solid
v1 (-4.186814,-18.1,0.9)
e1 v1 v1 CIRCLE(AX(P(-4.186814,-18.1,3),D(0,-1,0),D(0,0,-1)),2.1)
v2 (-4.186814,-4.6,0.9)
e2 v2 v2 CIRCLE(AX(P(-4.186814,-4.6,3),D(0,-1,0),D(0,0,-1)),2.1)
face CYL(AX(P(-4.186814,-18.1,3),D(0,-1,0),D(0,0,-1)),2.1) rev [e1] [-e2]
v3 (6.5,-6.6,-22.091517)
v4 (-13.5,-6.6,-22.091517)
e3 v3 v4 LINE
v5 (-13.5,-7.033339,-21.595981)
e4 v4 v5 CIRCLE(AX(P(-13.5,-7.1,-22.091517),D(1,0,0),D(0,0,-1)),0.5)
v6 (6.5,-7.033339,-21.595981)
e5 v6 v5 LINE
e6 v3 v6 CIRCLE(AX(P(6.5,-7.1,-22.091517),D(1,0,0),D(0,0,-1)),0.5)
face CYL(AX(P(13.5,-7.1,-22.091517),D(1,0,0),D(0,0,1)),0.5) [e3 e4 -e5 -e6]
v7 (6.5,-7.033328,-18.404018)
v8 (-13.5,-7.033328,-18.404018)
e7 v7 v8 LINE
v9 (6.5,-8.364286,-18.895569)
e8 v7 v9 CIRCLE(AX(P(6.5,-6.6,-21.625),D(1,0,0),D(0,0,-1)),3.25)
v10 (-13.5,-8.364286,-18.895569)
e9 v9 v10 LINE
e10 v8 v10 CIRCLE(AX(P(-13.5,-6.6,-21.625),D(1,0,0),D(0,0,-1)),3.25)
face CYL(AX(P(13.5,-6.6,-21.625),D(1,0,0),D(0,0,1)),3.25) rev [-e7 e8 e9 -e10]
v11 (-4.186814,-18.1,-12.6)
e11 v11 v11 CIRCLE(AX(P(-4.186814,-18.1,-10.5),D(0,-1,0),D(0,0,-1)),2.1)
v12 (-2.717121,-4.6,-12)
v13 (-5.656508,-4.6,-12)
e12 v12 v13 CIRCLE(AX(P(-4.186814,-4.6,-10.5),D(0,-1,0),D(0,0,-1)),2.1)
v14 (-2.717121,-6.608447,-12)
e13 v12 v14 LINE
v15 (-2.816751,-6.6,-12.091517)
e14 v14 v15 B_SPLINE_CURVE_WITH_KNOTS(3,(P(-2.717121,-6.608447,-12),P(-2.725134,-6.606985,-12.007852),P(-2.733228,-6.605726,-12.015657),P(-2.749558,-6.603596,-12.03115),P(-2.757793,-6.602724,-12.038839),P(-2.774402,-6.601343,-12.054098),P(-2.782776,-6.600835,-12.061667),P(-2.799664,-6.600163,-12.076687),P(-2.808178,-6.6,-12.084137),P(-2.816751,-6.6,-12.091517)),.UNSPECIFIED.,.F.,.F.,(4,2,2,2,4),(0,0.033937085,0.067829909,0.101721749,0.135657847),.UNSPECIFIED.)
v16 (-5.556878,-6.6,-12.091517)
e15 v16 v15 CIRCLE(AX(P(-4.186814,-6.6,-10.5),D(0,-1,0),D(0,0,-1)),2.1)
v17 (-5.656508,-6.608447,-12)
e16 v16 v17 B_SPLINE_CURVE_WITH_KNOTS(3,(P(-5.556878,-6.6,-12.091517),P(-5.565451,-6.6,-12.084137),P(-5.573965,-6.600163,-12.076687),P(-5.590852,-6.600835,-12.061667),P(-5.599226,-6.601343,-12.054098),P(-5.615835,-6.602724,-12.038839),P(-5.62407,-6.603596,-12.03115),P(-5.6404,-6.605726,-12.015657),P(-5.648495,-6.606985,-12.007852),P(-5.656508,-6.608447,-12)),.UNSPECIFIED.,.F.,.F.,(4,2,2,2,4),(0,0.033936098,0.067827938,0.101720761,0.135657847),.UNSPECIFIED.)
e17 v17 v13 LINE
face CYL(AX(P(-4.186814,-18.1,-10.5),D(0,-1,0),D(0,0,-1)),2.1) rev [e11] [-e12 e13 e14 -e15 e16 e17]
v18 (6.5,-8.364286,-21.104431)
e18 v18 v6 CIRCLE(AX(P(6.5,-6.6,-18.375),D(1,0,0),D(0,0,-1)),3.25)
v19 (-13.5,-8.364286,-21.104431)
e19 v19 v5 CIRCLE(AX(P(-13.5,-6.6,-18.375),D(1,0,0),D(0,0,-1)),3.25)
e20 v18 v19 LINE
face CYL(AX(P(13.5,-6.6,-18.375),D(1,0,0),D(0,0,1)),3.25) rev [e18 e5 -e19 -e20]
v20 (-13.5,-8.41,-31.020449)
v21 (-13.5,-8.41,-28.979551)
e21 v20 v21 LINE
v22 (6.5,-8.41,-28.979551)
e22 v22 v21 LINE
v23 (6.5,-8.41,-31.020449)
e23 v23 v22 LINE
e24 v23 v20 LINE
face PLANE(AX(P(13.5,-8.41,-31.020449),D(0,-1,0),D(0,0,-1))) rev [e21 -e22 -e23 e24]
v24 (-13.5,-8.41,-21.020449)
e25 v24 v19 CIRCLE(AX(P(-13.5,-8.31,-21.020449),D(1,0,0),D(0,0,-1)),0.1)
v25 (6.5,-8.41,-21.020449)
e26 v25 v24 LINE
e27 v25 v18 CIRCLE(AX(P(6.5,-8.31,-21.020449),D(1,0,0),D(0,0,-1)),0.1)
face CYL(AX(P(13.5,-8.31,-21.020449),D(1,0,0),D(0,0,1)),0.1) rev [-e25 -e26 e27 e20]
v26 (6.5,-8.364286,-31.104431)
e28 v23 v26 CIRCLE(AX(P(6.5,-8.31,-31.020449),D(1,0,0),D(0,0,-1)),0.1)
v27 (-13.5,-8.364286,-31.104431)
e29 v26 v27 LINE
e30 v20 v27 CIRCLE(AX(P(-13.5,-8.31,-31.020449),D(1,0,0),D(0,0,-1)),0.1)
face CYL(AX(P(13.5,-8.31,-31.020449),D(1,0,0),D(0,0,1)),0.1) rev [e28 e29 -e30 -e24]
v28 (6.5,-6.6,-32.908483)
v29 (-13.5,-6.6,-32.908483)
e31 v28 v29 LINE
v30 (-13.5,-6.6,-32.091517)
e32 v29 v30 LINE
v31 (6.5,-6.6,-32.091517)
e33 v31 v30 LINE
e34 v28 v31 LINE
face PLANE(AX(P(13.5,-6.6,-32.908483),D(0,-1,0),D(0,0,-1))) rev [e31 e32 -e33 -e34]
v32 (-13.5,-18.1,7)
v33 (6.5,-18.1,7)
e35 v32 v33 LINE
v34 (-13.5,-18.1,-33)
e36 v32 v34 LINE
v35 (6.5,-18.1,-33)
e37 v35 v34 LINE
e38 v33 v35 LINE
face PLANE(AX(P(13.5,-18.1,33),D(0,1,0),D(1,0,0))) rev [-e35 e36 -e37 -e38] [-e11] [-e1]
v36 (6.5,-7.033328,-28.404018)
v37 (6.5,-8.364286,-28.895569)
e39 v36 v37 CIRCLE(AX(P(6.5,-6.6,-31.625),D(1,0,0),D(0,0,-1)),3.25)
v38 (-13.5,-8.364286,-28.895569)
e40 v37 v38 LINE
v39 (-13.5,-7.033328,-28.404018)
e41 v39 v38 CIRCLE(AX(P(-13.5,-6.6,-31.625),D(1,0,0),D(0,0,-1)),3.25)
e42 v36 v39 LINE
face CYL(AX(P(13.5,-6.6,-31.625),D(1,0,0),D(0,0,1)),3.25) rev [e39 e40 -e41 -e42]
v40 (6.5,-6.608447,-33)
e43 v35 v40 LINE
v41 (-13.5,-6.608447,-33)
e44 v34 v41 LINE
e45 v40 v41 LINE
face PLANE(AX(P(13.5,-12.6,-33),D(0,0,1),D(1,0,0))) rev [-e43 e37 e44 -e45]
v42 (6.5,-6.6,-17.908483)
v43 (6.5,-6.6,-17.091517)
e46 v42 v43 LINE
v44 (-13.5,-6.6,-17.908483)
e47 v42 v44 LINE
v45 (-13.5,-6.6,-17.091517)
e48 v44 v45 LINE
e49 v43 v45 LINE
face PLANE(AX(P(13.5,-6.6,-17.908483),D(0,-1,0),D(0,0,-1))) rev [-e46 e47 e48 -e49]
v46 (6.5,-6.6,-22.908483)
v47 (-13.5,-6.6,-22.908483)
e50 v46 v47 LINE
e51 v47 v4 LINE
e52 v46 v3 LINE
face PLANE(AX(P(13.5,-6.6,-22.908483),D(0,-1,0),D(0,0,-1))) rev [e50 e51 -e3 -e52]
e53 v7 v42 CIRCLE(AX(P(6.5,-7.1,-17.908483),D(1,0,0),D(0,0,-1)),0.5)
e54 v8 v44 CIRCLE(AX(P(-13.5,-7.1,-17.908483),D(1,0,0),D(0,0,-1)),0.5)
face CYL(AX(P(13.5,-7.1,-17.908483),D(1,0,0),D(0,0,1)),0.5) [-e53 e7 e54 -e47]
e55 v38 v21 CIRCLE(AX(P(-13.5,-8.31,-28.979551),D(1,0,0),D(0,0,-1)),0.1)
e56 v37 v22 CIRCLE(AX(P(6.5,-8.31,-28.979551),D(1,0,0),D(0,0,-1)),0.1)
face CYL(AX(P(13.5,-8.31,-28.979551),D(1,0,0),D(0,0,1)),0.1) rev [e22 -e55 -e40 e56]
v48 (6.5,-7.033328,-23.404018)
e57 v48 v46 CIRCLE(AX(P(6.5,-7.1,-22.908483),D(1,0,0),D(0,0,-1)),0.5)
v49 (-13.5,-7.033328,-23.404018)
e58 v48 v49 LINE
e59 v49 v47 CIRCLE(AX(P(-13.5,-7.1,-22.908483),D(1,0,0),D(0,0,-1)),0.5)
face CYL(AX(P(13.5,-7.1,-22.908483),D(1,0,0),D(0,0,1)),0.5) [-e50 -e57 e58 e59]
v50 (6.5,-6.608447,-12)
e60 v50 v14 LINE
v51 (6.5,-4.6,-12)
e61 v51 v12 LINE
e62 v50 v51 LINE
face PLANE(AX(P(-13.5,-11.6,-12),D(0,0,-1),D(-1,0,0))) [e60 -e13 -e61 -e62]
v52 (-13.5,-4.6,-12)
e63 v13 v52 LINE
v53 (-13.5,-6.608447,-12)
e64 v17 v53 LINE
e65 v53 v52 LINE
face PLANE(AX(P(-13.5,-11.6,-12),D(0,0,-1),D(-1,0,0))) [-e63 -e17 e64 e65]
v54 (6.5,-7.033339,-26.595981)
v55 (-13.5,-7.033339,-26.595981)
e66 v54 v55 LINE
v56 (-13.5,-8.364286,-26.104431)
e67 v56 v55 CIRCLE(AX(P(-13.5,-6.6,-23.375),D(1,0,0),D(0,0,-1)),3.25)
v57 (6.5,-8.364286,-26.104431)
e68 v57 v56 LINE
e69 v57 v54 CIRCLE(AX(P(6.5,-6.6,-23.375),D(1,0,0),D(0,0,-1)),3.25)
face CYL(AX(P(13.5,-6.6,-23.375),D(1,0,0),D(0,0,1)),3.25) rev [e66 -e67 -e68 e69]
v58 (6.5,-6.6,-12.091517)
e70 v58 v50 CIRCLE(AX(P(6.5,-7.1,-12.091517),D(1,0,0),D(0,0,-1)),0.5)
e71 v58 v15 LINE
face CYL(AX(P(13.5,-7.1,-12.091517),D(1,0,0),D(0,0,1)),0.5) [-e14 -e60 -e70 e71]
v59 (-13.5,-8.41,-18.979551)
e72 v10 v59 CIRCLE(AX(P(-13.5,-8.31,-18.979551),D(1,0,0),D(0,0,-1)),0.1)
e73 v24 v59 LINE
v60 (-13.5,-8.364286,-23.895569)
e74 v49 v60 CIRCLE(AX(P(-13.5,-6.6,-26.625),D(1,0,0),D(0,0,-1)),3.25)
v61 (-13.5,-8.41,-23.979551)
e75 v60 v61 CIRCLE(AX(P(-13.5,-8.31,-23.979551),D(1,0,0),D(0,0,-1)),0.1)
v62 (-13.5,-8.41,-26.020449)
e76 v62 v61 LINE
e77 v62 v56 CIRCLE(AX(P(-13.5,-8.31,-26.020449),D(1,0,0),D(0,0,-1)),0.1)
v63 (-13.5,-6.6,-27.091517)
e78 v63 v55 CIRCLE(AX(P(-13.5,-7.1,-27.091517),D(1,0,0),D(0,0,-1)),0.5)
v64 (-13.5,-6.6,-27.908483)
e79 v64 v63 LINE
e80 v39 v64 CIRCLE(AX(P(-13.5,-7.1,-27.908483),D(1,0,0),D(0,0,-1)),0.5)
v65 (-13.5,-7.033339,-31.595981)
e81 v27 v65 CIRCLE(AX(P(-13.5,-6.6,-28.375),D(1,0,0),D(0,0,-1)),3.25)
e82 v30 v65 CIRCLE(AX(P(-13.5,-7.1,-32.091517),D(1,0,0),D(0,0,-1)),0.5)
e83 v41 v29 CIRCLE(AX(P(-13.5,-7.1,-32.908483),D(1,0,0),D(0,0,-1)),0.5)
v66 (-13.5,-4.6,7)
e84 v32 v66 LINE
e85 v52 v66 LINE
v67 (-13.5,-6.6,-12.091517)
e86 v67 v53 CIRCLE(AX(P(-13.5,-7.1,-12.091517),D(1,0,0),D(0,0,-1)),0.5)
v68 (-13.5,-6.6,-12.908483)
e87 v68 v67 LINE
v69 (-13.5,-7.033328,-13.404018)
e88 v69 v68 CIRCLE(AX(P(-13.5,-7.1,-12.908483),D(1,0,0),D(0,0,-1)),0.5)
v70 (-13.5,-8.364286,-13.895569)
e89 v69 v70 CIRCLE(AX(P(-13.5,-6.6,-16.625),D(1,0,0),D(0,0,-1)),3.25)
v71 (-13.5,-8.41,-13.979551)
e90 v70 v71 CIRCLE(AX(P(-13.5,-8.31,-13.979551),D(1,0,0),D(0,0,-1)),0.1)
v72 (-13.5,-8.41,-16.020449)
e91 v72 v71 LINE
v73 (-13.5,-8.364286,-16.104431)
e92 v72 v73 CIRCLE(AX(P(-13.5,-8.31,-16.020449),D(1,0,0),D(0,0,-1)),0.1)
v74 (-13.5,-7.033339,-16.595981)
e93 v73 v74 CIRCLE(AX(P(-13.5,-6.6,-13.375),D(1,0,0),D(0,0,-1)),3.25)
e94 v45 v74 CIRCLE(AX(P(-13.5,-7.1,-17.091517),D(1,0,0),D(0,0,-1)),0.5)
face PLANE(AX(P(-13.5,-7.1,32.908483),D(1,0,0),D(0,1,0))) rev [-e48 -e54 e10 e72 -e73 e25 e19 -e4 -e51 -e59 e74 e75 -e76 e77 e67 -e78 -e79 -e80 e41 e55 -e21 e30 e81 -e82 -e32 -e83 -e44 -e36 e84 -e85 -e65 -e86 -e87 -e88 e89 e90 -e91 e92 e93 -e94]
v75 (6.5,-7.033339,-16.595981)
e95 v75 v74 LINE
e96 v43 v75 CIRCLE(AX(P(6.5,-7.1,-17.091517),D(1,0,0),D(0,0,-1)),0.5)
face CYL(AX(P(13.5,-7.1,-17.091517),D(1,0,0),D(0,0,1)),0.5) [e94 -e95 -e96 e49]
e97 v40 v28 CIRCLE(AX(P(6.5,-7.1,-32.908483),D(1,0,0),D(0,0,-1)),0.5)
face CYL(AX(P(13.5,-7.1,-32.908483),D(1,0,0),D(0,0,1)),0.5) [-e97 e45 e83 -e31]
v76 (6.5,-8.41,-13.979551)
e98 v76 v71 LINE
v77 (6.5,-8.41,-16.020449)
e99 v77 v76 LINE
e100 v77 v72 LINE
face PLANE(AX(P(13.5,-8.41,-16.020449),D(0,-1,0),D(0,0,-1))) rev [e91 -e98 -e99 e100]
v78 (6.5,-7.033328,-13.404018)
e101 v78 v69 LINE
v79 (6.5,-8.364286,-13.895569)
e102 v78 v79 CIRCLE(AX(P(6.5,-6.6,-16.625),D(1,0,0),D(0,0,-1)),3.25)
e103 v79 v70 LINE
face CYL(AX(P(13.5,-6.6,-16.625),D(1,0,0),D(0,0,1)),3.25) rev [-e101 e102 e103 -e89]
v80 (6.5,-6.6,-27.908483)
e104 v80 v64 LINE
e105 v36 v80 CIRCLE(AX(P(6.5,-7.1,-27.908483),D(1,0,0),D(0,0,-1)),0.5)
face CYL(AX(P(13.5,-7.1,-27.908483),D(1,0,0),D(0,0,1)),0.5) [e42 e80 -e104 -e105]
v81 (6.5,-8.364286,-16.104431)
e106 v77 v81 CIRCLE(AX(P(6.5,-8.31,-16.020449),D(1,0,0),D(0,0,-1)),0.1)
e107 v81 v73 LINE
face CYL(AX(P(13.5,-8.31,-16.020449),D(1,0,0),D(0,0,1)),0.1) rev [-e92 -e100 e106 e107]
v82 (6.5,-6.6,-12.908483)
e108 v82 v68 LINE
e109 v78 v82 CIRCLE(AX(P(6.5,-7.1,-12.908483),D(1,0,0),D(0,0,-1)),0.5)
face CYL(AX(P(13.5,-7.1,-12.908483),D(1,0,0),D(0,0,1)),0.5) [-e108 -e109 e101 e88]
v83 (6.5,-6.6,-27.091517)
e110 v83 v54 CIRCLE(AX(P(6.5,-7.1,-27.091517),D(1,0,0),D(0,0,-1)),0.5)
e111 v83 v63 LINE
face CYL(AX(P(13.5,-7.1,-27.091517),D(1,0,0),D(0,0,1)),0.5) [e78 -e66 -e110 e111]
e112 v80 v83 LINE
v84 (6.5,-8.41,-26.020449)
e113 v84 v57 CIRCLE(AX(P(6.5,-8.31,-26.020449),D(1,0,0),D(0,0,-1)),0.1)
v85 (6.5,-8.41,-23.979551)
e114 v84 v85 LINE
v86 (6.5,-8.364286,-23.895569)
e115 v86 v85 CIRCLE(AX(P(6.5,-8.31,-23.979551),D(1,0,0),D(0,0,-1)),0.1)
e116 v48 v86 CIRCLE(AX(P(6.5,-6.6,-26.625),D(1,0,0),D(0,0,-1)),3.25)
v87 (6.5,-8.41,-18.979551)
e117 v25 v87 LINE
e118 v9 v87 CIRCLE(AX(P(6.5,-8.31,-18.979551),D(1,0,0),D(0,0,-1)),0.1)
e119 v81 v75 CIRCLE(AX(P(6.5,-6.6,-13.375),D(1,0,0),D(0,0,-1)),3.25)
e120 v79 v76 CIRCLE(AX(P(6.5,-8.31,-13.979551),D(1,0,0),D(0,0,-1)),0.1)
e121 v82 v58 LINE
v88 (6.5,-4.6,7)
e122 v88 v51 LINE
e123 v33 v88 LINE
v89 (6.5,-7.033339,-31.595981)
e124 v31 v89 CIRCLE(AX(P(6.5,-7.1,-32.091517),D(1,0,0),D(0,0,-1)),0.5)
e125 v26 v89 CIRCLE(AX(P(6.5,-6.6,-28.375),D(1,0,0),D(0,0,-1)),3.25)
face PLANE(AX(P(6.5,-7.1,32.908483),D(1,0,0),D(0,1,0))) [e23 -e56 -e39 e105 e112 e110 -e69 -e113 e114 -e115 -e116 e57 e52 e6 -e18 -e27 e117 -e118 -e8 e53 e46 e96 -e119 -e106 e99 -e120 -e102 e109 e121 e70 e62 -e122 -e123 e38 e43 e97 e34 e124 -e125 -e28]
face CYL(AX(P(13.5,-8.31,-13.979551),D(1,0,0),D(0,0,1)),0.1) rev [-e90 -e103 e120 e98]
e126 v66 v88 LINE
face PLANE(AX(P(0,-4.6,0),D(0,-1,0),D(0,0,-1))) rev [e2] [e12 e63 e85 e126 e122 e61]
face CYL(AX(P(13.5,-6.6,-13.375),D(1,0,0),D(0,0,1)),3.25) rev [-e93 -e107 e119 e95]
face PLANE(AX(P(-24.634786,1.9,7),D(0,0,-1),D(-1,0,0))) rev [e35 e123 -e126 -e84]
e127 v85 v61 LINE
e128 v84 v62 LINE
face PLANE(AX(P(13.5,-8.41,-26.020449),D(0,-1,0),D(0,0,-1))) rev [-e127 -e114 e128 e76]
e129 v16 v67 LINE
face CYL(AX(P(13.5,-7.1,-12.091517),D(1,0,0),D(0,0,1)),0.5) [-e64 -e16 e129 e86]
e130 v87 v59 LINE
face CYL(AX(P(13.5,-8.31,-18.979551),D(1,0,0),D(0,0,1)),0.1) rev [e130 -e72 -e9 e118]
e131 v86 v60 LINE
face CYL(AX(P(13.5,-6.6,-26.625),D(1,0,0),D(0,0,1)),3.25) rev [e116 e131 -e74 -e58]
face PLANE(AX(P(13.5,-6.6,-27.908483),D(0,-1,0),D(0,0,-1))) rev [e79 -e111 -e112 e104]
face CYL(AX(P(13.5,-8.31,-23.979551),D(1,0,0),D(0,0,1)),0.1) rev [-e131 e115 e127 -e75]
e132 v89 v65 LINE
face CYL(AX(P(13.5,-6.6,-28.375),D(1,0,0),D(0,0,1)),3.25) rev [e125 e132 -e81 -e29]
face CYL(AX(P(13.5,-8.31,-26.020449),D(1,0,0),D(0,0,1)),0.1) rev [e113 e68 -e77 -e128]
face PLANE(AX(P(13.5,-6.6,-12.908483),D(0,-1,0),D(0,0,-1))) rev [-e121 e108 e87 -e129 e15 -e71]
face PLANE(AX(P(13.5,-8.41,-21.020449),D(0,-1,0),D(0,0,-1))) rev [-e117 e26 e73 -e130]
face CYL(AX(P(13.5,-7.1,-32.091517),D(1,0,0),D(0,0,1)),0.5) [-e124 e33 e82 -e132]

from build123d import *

# Parameters (mm, degrees)
DELETE_START           = -13.5
DELETE_FACE_1_DEPTH    = 27
MOVE_FACE_1_BY         = 7
MOVE_FACE_2_BY         = 5.5
SKETCH_2_W             = 48.263019836
SKETCH_2_H             = 43.058184364
CUT_EXTRUDE_1_DEPTH    = 20
EXTRUDE_1_DEPTH        = 2
EXTRUDE_1_DEPTH_BACK   = 5
SKETCH_3_W             = 20
SKETCH_3_H             = 19
HOLE_WIZARD_M5_1_D     = 4.2
HOLE_WIZARD_M5_1_DEPTH = 20
HOLE_WIZARD_M5_1_TIP   = 1.2618073


with BuildPart() as part:
    # Delete Face 1: read off the stored shape, not the designer's step
    # Delete Face 1 outline → Delete Face 1 (new body)
    with BuildSketch(Plane.YZ.offset(DELETE_START)):
        with BuildLine():
            ThreePointArc((-8.364285714, 23.895568572), (-8.397831007, 23.931741933), (-8.41, 23.979551078))
            Line((-8.41, 23.979551078), (-8.41, 26.020448922))
            ThreePointArc((-8.41, 26.020448922), (-8.397831007, 26.068258067), (-8.364285714, 26.104431428))
            ThreePointArc((-8.364285714, 26.104431428), (-7.725958169, 26.423724028), (-7.033327746, 26.595982314))
            ThreePointArc((-7.033327746, 26.595982314), (-6.723611818, 26.762379014), (-6.6, 27.091517187))
            Line((-6.6, 27.091517187), (-6.6, 27.908482813))
            ThreePointArc((-6.6, 27.908482813), (-6.723615527, 28.237625227), (-7.033338915, 28.404019189))
            ThreePointArc((-7.033338915, 28.404019189), (-7.725963455, 28.576277924), (-8.364285714, 28.895568572))
            ThreePointArc((-8.364285714, 28.895568572), (-8.397831007, 28.931741933), (-8.41, 28.979551078))
            Line((-8.41, 28.979551078), (-8.41, 31.020448922))
            ThreePointArc((-8.41, 31.020448922), (-8.397831007, 31.068258067), (-8.364285714, 31.104431428))
            ThreePointArc((-8.364285714, 31.104431428), (-7.725958168, 31.423724029), (-7.033327744, 31.595982314))
            ThreePointArc((-7.033327744, 31.595982314), (-6.723611817, 31.762379015), (-6.6, 32.091517187))
            Line((-6.6, 32.091517187), (-6.6, 32.908482813))
            ThreePointArc((-6.6, 32.908482813), (-6.602116164, 32.954435895), (-6.608446743, 33))
            Line((-6.608446743, 33), (-12.6, 33))
            Line((-12.6, 33), (-12.6, -33))
            Line((-12.6, -33), (-6.608446743, -33))
            ThreePointArc((-6.608446743, -33), (-6.602116164, -32.954435895), (-6.6, -32.908482813))
            Line((-6.6, -32.908482813), (-6.6, -32.091517187))
            ThreePointArc((-6.6, -32.091517187), (-6.723615531, -31.762374768), (-7.033338927, -31.595980809))
            ThreePointArc((-7.033338927, -31.595980809), (-7.72596346, -31.423722074), (-8.364285714, -31.104431428))
            ThreePointArc((-8.364285714, -31.104431428), (-8.397831007, -31.068258067), (-8.41, -31.020448922))
            Line((-8.41, -31.020448922), (-8.41, -28.979551078))
            ThreePointArc((-8.41, -28.979551078), (-8.397831007, -28.931741933), (-8.364285714, -28.895568572))
            ThreePointArc((-8.364285714, -28.895568572), (-7.725958168, -28.576275971), (-7.033327744, -28.404017686))
            ThreePointArc((-7.033327744, -28.404017686), (-6.723611817, -28.237620985), (-6.6, -27.908482813))
            Line((-6.6, -27.908482813), (-6.6, -27.091517187))
            ThreePointArc((-6.6, -27.091517187), (-6.723615528, -26.762374772), (-7.033338917, -26.595980811))
            ThreePointArc((-7.033338917, -26.595980811), (-7.725963456, -26.423722076), (-8.364285714, -26.104431428))
            ThreePointArc((-8.364285714, -26.104431428), (-8.397831007, -26.068258067), (-8.41, -26.020448922))
            Line((-8.41, -26.020448922), (-8.41, -23.979551078))
            ThreePointArc((-8.41, -23.979551078), (-8.397831007, -23.931741933), (-8.364285714, -23.895568572))
            ThreePointArc((-8.364285714, -23.895568572), (-7.725958169, -23.576275972), (-7.033327746, -23.404017686))
            ThreePointArc((-7.033327746, -23.404017686), (-6.723611818, -23.237620986), (-6.6, -22.908482813))
            Line((-6.6, -22.908482813), (-6.6, -22.091517187))
            ThreePointArc((-6.6, -22.091517187), (-6.723615529, -21.76237477), (-7.033338921, -21.59598081))
            ThreePointArc((-7.033338921, -21.59598081), (-7.725963458, -21.423722075), (-8.364285714, -21.104431428))
            ThreePointArc((-8.364285714, -21.104431428), (-8.397831007, -21.068258067), (-8.41, -21.020448922))
            Line((-8.41, -21.020448922), (-8.41, -18.979551078))
            ThreePointArc((-8.41, -18.979551078), (-8.397831007, -18.931741933), (-8.364285714, -18.895568572))
            ThreePointArc((-8.364285714, -18.895568572), (-7.725958168, -18.576275971), (-7.033327744, -18.404017686))
            ThreePointArc((-7.033327744, -18.404017686), (-6.723611817, -18.237620985), (-6.6, -17.908482813))
            Line((-6.6, -17.908482813), (-6.6, -17.091517187))
            ThreePointArc((-6.6, -17.091517187), (-6.723615531, -16.762374768), (-7.033338926, -16.595980809))
            ThreePointArc((-7.033338926, -16.595980809), (-7.72596346, -16.423722074), (-8.364285714, -16.104431428))
            ThreePointArc((-8.364285714, -16.104431428), (-8.397831007, -16.068258067), (-8.41, -16.020448922))
            Line((-8.41, -16.020448922), (-8.41, -13.979551078))
            ThreePointArc((-8.41, -13.979551078), (-8.397831007, -13.931741933), (-8.364285714, -13.895568572))
            ThreePointArc((-8.364285714, -13.895568572), (-7.725958337, -13.576276034), (-7.033328102, -13.404017734))
            ThreePointArc((-7.033328102, -13.404017734), (-6.723611936, -13.237621121), (-6.6, -12.908482813))
            Line((-6.6, -12.908482813), (-6.6, -12.091517187))
            ThreePointArc((-6.6, -12.091517187), (-6.723615532, -11.762374767), (-7.033338929, -11.595980809))
            ThreePointArc((-7.033338929, -11.595980809), (-7.725963462, -11.423722074), (-8.364285714, -11.104431428))
            ThreePointArc((-8.364285714, -11.104431428), (-8.397831007, -11.068258067), (-8.41, -11.020448922))
            Line((-8.41, -11.020448922), (-8.41, -8.979551078))
            ThreePointArc((-8.41, -8.979551078), (-8.397831007, -8.931741933), (-8.364285714, -8.895568572))
            ThreePointArc((-8.364285714, -8.895568572), (-7.725958524, -8.576276103), (-7.033328496, -8.404017787))
            ThreePointArc((-7.033328496, -8.404017787), (-6.723612067, -8.23762127), (-6.6, -7.908482813))
            Line((-6.6, -7.908482813), (-6.6, -7.091517187))
            ThreePointArc((-6.6, -7.091517187), (-6.723615306, -6.762375026), (-7.033338249, -6.595980901))
            ThreePointArc((-7.033338249, -6.595980901), (-7.72596314, -6.423722193), (-8.364285714, -6.104431428))
            ThreePointArc((-8.364285714, -6.104431428), (-8.397831007, -6.068258067), (-8.41, -6.020448922))
            Line((-8.41, -6.020448922), (-8.41, -3.979551078))
            ThreePointArc((-8.41, -3.979551078), (-8.397831007, -3.931741933), (-8.364285714, -3.895568572))
            ThreePointArc((-8.364285714, -3.895568572), (-7.725958462, -3.57627608), (-7.033328366, -3.40401777))
            ThreePointArc((-7.033328366, -3.40401777), (-6.723612024, -3.237621221), (-6.6, -2.908482813))
            Line((-6.6, -2.908482813), (-6.6, -2.091517187))
            ThreePointArc((-6.6, -2.091517187), (-6.723615307, -1.762375024), (-7.033338252, -1.5959809))
            ThreePointArc((-7.033338252, -1.5959809), (-7.725963141, -1.423722192), (-8.364285714, -1.104431428))
            ThreePointArc((-8.364285714, -1.104431428), (-8.397831007, -1.068258067), (-8.41, -1.020448922))
            Line((-8.41, -1.020448922), (-8.41, 1.020448922))
            ThreePointArc((-8.41, 1.020448922), (-8.397831007, 1.068258067), (-8.364285714, 1.104431428))
            ThreePointArc((-8.364285714, 1.104431428), (-7.725958462, 1.42372392), (-7.033328366, 1.59598223))
            ThreePointArc((-7.033328366, 1.59598223), (-6.723612024, 1.762378779), (-6.6, 2.091517187))
            Line((-6.6, 2.091517187), (-6.6, 2.908482813))
            ThreePointArc((-6.6, 2.908482813), (-6.723615307, 3.237624975), (-7.033338252, 3.4040191))
            ThreePointArc((-7.033338252, 3.4040191), (-7.725963141, 3.576277808), (-8.364285714, 3.895568572))
            ThreePointArc((-8.364285714, 3.895568572), (-8.397831007, 3.931741933), (-8.41, 3.979551078))
            Line((-8.41, 3.979551078), (-8.41, 6.020448922))
            ThreePointArc((-8.41, 6.020448922), (-8.397831007, 6.068258067), (-8.364285714, 6.104431428))
            ThreePointArc((-8.364285714, 6.104431428), (-7.725958469, 6.423723918), (-7.03332838, 6.595982228))
            ThreePointArc((-7.03332838, 6.595982228), (-6.723612029, 6.762378774), (-6.6, 7.091517187))
            Line((-6.6, 7.091517187), (-6.6, 7.908482813))
            ThreePointArc((-6.6, 7.908482813), (-6.723615311, 8.23762498), (-7.033338263, 8.404019101))
            ThreePointArc((-7.033338263, 8.404019101), (-7.725963146, 8.57627781), (-8.364285714, 8.895568572))
            ThreePointArc((-8.364285714, 8.895568572), (-8.397831007, 8.931741933), (-8.41, 8.979551078))
            Line((-8.41, 8.979551078), (-8.41, 11.020448922))
            ThreePointArc((-8.41, 11.020448922), (-8.397831007, 11.068258067), (-8.364285714, 11.104431428))
            ThreePointArc((-8.364285714, 11.104431428), (-7.725958337, 11.423723966), (-7.033328101, 11.595982266))
            ThreePointArc((-7.033328101, 11.595982266), (-6.723611936, 11.76237888), (-6.6, 12.091517187))
            Line((-6.6, 12.091517187), (-6.6, 12.908482813))
            ThreePointArc((-6.6, 12.908482813), (-6.72361553, 13.237625231), (-7.033338924, 13.40401919))
            ThreePointArc((-7.033338924, 13.40401919), (-7.725963459, 13.576277925), (-8.364285714, 13.895568572))
            ThreePointArc((-8.364285714, 13.895568572), (-8.397831007, 13.931741933), (-8.41, 13.979551078))
            Line((-8.41, 13.979551078), (-8.41, 16.020448922))
            ThreePointArc((-8.41, 16.020448922), (-8.397831007, 16.068258067), (-8.364285714, 16.104431428))
            ThreePointArc((-8.364285714, 16.104431428), (-7.725958169, 16.423724029), (-7.033327745, 16.595982314))
            ThreePointArc((-7.033327745, 16.595982314), (-6.723611818, 16.762379015), (-6.6, 17.091517187))
            Line((-6.6, 17.091517187), (-6.6, 17.908482813))
            ThreePointArc((-6.6, 17.908482813), (-6.72361553, 18.23762523), (-7.033338923, 18.40401919))
            ThreePointArc((-7.033338923, 18.40401919), (-7.725963459, 18.576277925), (-8.364285714, 18.895568572))
            ThreePointArc((-8.364285714, 18.895568572), (-8.397831007, 18.931741933), (-8.41, 18.979551078))
            Line((-8.41, 18.979551078), (-8.41, 21.020448922))
            ThreePointArc((-8.41, 21.020448922), (-8.397831007, 21.068258067), (-8.364285714, 21.104431428))
            ThreePointArc((-8.364285714, 21.104431428), (-7.725958168, 21.423724029), (-7.033327744, 21.595982314))
            ThreePointArc((-7.033327744, 21.595982314), (-6.723611817, 21.762379015), (-6.6, 22.091517187))
            Line((-6.6, 22.091517187), (-6.6, 22.908482813))
            ThreePointArc((-6.6, 22.908482813), (-6.723615528, 23.237625227), (-7.033338915, 23.404019189))
            ThreePointArc((-7.033338915, 23.404019189), (-7.725963455, 23.576277924), (-8.364285714, 23.895568572))
        make_face()
    extrude(amount=DELETE_FACE_1_DEPTH)

    # Move Face 1: a face moved inward by 7.0
    extrude(part.faces().sort_by_distance((13.5, -10.05864991, 0))[0], amount=MOVE_FACE_1_BY, dir=(-1, 0, 0), mode=Mode.SUBTRACT)

    # Move Face 2: a face moved outward by 5.5
    extrude(part.faces().sort_by_distance((-3.5, -12.6, 0))[0], amount=MOVE_FACE_2_BY, dir=(0, -1, 0))

    # 草图2 → 切除-拉伸1 (cut)
    with BuildSketch(Plane.XZ.offset(18.1)):
        with Locations((-0.503276546, 28.529092182)):
            Rectangle(SKETCH_2_W, SKETCH_2_H)
    extrude(amount=-CUT_EXTRUDE_1_DEPTH, mode=Mode.SUBTRACT)

    # 草图3 → 凸台-拉伸1 (add, two sides: drawn at the far end of the back side and taken through both)
    with BuildSketch(Plane(origin=(0, -6.6, 0), x_dir=(1, 0, 0), z_dir=(0, 1, 0)).offset(-EXTRUDE_1_DEPTH_BACK)):
        with Locations((-3.5, 2.5)):
            Rectangle(SKETCH_3_W, SKETCH_3_H)
    extrude(amount=EXTRUDE_1_DEPTH + EXTRUDE_1_DEPTH_BACK)

    # M5 螺纹孔1
    with Locations(Plane(origin=(-4.186814404, -18.1, 3), x_dir=(0, 0, -1), z_dir=(0, -1, 0))):
        with Locations((0, 0), (13.5, 0)):
            Hole(HOLE_WIZARD_M5_1_D / 2, depth=HOLE_WIZARD_M5_1_DEPTH)
            with Locations((0, 0, -(HOLE_WIZARD_M5_1_DEPTH + HOLE_WIZARD_M5_1_TIP / 2))):  # 118° drill point
                Cone(0, HOLE_WIZARD_M5_1_D / 2, HOLE_WIZARD_M5_1_TIP, mode=Mode.SUBTRACT)


solid = part.part
